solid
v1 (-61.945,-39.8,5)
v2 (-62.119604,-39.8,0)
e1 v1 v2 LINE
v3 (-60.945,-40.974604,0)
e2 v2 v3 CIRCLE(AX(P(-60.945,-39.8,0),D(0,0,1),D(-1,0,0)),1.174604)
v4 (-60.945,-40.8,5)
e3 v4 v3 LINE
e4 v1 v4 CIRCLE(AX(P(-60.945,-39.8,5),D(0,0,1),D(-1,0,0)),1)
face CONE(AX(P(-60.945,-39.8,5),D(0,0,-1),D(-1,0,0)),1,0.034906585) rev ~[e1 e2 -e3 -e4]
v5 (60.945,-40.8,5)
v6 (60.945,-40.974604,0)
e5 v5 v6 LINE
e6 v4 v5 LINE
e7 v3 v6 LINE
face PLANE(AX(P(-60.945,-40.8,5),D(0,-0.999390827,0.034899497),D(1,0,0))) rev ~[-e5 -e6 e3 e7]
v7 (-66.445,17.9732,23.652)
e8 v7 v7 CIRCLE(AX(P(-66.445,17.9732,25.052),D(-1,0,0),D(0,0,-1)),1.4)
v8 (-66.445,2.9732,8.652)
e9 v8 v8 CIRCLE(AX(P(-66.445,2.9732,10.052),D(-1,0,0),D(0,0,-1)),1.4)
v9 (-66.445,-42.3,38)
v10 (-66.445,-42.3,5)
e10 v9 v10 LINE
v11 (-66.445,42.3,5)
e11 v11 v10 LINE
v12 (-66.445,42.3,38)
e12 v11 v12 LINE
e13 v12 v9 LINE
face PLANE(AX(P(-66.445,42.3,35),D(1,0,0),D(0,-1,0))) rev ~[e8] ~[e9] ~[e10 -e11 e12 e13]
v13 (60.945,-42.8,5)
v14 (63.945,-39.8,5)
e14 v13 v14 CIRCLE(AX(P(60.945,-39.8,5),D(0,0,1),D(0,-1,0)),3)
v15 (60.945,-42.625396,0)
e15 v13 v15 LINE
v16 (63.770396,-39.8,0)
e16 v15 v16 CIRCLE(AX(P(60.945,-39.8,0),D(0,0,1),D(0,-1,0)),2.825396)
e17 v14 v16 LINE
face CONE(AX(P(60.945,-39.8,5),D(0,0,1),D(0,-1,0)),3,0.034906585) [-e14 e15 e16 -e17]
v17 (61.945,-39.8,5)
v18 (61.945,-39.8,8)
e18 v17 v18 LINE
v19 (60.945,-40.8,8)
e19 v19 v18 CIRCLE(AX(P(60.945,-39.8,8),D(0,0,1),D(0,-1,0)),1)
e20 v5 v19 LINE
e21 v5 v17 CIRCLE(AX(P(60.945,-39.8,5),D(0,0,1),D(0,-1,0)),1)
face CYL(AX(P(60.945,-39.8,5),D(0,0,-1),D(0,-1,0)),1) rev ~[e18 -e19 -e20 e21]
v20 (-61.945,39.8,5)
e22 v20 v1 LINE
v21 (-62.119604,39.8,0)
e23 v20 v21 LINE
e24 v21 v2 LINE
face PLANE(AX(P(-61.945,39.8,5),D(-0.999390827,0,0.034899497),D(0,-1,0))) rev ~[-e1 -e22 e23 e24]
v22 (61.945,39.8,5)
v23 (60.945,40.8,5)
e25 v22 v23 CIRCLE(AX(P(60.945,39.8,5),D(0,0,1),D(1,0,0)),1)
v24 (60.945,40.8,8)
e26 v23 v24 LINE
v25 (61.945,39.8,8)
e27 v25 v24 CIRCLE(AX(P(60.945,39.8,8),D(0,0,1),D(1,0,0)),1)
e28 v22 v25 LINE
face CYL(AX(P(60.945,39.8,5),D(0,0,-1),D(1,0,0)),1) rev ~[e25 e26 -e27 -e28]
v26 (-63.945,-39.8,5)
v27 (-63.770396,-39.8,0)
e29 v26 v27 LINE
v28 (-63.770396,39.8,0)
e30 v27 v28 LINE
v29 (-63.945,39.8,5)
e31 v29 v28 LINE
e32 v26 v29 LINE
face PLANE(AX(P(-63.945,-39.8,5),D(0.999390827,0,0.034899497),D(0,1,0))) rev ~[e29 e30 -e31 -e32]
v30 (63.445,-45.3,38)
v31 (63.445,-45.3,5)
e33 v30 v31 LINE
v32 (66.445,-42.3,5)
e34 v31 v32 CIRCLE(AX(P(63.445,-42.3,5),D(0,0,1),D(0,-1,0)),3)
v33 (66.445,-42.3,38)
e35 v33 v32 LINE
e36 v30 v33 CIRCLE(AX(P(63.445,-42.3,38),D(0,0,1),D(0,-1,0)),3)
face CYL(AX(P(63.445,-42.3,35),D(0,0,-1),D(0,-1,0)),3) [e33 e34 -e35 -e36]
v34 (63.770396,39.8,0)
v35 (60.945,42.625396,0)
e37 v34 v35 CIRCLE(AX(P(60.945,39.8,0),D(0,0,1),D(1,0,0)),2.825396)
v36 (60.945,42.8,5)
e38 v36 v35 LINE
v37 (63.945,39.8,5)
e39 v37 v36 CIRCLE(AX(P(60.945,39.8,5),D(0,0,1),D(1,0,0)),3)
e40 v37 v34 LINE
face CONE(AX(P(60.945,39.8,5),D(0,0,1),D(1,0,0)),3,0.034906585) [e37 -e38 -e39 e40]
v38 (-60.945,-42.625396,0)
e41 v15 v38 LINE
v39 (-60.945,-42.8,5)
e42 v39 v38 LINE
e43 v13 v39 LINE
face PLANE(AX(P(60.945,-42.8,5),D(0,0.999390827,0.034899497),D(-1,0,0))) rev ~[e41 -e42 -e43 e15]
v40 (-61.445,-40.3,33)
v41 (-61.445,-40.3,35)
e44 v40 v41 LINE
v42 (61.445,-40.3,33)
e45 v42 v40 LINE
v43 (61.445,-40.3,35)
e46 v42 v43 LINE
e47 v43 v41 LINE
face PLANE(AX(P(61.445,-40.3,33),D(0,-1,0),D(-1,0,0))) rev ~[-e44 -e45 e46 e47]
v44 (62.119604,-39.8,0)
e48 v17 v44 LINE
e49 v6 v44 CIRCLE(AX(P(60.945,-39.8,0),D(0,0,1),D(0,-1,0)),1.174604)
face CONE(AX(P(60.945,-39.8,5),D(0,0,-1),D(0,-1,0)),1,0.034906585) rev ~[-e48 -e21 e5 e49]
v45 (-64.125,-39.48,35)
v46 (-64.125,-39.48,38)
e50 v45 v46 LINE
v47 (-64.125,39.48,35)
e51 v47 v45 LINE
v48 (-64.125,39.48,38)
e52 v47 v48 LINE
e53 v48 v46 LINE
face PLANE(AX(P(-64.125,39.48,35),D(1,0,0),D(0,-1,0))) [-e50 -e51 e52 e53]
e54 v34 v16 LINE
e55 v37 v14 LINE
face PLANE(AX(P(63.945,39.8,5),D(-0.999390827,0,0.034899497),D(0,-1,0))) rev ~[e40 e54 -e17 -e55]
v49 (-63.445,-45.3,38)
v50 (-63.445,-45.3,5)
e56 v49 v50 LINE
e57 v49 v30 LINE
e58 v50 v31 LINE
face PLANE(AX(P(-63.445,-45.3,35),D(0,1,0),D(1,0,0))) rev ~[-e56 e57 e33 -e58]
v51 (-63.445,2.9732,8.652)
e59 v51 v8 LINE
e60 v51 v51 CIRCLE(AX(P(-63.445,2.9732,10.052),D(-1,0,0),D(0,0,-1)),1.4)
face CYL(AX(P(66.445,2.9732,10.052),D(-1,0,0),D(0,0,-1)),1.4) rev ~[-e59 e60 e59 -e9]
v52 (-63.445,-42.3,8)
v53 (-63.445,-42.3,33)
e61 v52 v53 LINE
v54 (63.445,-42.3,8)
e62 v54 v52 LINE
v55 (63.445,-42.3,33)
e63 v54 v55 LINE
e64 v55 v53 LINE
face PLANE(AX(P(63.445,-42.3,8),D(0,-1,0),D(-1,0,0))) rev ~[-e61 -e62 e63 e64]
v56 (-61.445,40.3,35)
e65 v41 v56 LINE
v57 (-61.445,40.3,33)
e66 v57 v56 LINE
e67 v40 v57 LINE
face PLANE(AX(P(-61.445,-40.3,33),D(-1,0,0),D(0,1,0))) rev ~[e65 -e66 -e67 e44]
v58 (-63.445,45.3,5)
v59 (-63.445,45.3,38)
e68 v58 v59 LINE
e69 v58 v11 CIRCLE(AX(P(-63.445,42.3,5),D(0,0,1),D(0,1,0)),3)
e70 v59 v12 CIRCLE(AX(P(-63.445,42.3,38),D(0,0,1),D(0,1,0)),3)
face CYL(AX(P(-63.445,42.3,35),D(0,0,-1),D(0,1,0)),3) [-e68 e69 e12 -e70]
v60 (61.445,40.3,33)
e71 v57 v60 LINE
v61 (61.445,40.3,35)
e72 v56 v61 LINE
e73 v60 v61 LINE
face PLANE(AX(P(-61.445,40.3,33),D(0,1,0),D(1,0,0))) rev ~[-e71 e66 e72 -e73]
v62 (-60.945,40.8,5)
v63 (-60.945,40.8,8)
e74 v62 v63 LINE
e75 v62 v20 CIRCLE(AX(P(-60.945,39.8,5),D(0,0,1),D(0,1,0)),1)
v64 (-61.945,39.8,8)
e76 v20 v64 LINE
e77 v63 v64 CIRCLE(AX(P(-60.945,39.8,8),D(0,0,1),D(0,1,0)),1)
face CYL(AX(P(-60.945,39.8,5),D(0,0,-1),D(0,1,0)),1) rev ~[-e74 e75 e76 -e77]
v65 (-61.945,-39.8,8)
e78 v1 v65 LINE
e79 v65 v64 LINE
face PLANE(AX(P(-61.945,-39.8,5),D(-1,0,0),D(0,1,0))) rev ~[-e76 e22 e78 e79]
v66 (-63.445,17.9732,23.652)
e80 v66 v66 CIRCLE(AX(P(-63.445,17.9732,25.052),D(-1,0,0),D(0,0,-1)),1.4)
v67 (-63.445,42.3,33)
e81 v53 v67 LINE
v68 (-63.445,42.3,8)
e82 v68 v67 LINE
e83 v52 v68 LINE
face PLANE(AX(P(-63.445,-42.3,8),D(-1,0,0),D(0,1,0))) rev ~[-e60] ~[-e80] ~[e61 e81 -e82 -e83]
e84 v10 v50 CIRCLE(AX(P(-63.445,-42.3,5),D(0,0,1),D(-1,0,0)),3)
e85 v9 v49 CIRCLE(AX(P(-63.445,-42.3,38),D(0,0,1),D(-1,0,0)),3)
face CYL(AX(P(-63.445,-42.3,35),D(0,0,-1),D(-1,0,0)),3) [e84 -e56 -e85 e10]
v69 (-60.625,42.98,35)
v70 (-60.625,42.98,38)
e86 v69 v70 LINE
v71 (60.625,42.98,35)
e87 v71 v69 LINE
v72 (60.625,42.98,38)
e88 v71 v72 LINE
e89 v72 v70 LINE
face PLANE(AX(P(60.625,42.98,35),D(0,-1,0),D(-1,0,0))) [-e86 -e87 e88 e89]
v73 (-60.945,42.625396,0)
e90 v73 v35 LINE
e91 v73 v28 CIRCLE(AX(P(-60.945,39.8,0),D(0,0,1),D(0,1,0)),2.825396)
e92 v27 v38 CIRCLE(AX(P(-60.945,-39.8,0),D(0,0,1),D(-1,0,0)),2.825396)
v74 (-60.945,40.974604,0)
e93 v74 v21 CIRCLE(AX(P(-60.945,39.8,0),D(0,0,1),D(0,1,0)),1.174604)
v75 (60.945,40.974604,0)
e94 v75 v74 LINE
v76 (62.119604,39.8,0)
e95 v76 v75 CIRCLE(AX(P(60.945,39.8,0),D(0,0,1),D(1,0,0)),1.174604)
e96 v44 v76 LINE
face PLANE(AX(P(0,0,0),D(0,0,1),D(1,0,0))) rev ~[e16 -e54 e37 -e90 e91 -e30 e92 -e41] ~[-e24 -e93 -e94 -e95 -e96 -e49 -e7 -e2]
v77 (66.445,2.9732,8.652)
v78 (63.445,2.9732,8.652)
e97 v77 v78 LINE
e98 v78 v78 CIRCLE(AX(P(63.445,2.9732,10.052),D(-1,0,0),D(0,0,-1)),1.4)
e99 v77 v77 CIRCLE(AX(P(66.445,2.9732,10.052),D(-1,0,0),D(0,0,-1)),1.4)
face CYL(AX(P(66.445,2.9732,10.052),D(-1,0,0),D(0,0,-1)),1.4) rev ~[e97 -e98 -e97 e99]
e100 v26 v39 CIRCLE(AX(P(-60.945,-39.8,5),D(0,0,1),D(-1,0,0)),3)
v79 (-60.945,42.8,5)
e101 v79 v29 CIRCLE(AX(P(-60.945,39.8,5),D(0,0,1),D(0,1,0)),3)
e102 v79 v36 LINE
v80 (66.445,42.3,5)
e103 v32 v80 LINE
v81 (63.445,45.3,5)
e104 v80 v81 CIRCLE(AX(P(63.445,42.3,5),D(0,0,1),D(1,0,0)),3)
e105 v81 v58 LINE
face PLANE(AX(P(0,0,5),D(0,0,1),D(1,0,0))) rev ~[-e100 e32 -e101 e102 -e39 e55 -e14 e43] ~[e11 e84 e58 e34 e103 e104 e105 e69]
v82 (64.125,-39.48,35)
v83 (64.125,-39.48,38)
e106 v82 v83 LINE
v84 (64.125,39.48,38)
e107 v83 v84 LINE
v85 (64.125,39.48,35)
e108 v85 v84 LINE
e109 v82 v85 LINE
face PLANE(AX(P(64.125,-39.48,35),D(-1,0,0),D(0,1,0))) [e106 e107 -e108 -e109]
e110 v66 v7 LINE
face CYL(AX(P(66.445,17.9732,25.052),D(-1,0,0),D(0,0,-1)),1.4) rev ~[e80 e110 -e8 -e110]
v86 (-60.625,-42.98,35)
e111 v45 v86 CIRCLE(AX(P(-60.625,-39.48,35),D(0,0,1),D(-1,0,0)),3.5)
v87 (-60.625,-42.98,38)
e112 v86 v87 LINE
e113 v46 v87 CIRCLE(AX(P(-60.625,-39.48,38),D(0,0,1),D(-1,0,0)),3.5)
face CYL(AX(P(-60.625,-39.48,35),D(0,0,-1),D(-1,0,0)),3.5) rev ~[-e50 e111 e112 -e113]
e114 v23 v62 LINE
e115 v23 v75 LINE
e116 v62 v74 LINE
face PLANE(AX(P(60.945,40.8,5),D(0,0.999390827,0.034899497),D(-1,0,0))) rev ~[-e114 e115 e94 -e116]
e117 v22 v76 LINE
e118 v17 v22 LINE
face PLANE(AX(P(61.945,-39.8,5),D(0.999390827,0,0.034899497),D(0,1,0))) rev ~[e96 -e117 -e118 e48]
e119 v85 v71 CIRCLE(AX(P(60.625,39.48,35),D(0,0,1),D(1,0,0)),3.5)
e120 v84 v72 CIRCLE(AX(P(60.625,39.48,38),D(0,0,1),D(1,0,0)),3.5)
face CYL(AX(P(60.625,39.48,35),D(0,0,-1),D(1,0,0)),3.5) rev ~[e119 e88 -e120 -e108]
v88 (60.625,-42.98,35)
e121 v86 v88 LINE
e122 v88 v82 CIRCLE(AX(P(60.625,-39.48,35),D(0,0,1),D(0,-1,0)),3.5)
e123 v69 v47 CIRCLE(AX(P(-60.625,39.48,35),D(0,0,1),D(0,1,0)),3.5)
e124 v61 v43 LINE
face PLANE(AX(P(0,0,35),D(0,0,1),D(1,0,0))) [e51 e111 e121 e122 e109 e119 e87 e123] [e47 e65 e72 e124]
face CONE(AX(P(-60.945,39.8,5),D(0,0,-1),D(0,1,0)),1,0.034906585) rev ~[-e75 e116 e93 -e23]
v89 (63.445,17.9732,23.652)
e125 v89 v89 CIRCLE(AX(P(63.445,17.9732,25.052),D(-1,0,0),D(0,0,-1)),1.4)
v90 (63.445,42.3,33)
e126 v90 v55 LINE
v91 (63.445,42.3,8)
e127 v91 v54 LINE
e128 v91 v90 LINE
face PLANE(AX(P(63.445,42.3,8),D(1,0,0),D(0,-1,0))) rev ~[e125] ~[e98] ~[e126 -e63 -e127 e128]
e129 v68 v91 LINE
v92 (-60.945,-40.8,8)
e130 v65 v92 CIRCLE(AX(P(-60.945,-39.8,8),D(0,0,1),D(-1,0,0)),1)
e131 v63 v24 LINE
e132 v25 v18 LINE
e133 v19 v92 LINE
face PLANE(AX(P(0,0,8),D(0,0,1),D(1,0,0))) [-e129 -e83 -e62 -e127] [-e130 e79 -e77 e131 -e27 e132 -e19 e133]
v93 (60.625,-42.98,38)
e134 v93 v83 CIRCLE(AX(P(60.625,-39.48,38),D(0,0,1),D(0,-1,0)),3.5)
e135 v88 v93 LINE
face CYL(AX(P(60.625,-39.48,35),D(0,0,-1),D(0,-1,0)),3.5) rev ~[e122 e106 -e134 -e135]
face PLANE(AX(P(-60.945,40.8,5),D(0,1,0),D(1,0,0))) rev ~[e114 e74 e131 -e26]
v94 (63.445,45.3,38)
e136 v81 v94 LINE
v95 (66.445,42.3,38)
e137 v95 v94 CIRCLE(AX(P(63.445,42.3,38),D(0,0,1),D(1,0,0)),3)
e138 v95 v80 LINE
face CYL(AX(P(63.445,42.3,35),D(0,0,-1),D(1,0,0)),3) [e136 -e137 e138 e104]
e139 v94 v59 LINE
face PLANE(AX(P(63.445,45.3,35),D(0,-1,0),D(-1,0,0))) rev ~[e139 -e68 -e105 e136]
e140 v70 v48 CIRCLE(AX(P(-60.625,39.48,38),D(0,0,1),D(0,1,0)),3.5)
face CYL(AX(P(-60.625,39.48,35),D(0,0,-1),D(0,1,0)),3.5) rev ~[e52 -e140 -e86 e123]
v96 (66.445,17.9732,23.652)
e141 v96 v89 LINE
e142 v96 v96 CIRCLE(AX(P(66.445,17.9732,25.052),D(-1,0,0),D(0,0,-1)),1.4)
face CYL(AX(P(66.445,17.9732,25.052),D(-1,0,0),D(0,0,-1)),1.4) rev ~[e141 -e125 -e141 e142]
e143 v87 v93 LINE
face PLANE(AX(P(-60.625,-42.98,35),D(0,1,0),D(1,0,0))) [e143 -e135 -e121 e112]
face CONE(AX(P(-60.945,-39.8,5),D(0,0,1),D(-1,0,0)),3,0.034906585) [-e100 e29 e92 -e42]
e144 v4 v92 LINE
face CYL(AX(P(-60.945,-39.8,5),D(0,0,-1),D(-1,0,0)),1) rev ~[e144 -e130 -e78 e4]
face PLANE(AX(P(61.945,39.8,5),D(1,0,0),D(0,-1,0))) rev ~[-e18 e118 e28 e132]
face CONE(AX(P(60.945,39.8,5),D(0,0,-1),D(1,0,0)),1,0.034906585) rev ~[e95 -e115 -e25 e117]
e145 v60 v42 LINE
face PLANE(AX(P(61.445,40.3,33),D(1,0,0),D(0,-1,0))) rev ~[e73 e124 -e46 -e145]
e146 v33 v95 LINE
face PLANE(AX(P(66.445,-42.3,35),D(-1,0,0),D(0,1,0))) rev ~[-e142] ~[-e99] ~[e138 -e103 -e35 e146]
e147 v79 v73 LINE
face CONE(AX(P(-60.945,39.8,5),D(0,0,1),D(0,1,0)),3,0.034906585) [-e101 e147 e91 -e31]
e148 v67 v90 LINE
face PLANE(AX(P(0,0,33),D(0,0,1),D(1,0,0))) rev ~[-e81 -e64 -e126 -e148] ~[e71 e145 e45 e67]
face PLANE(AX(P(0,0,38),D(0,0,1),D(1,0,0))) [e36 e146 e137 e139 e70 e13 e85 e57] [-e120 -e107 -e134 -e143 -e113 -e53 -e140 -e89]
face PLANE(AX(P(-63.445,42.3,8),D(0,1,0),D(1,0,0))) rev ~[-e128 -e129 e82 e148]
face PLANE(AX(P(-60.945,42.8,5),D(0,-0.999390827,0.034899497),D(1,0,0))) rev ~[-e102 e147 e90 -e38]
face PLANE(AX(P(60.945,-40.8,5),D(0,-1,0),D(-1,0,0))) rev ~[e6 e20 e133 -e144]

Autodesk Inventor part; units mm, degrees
ref_plane "YZ Plane" through (0, 0, 0) normal (1, 0, 0) x (0, 1, 0)
ref_plane "XZ Plane" through (0, 0, 0) normal (0, 1, 0) x (-1, 0, 0)
ref_plane "Arbeitsebene1" through (0, 0, 0) normal (0, 0, 1) x (1, 0, 0)
ref_plane "Arbeitsebene2" through (0, 0, 5) normal (0, 0, 1) x (1, 0, 0)
sketch "Skizze2" plane through (0, 0, 5) normal (0, 0, 1) x (1, 0, 0)
  arc A0 (-24.056, -76.2783) -> (-18.8, -75.35) centre (-21.51, -75.35) ccw projected
  arc A1 (63.445, -45.3) -> (66.445, -42.3) centre (63.445, -42.3) ccw projected
  line L0 (66.445, -42.3) -> (66.445, 42.3) projected
  arc A2 (66.445, 42.3) -> (63.445, 45.3) centre (63.445, 42.3) ccw projected
  line L1 (63.445, 45.3) -> (-63.445, 45.3) projected
  arc A3 (-63.445, 45.3) -> (-66.445, 42.3) centre (-63.445, 42.3) ccw projected
  line L2 (-66.445, 42.3) -> (-66.445, -42.3) projected
  arc A4 (-66.445, -42.3) -> (-63.445, -45.3) centre (-63.445, -42.3) ccw projected
  line L3 (-63.445, -45.3) -> (63.445, -45.3) projected
  arc A5 (63.945, 39.8) -> (60.945, 42.8) centre (60.945, 39.8) ccw projected
  line L4 (63.945, 39.8) -> (63.945, -39.8) projected
  arc A6 (60.945, -42.8) -> (63.945, -39.8) centre (60.945, -39.8) ccw projected
  line L5 (60.945, -42.8) -> (-60.945, -42.8) projected
  arc A7 (-63.945, -39.8) -> (-60.945, -42.8) centre (-60.945, -39.8) ccw projected
  line L6 (-63.945, -39.8) -> (-63.945, 39.8) projected
  arc A8 (-60.945, 42.8) -> (-63.945, 39.8) centre (-60.945, 39.8) ccw projected
  line L7 (-60.945, 42.8) -> (60.945, 42.8) projected
  line L8 (-61.945, 39.8) -> (-61.945, -39.8)
  arc A9 (-61.945, -39.8) -> (-60.945, -40.8) centre (-60.945, -39.8) ccw
  line L9 (-60.945, -40.8) -> (60.945, -40.8)
  arc A10 (60.945, -40.8) -> (61.945, -39.8) centre (60.945, -39.8) ccw
  line L10 (61.945, -39.8) -> (61.945, 39.8)
  arc A11 (61.945, 39.8) -> (60.945, 40.8) centre (60.945, 39.8) ccw
  line L11 (60.945, 40.8) -> (-60.945, 40.8)
  arc A12 (-60.945, 40.8) -> (-61.945, 39.8) centre (-60.945, 39.8) ccw
  point P0 (0, 0)
  dimension "d1" = 2
ref_plane "Arbeitsebene3" through (-63.945, -42.8, 0) normal (0, 0, 1) x (1, 0, 0)
extrude "Extrusion1" add sketch "Skizze2" against normal up to surface (5 mm away) draft -2 contours L4 A6 L5 A7 L6 A8 L7 A5
sketch "Skizze3" plane through (0, 0, 5) normal (0, 0, 1) x (1, 0, 0)
  arc A0 (63.445, -45.3) -> (66.445, -42.3) centre (63.445, -42.3) ccw projected
  line L0 (66.445, -42.3) -> (66.445, 42.3) projected
  arc A1 (66.445, 42.3) -> (63.445, 45.3) centre (63.445, 42.3) ccw projected
  line L1 (63.445, 45.3) -> (-63.445, 45.3) projected
  arc A2 (-63.445, 45.3) -> (-66.445, 42.3) centre (-63.445, 42.3) ccw projected
  line L2 (-66.445, 42.3) -> (-66.445, -42.3) projected
  arc A3 (-66.445, -42.3) -> (-63.445, -45.3) centre (-63.445, -42.3) ccw projected
  line L3 (-63.445, -45.3) -> (63.445, -45.3) projected
  arc A4 (63.945, 39.8) -> (60.945, 42.8) centre (60.945, 39.8) ccw projected
  line L4 (63.945, 39.8) -> (63.945, -39.8) projected
  arc A5 (60.945, -42.8) -> (63.945, -39.8) centre (60.945, -39.8) ccw projected
  line L5 (60.945, -42.8) -> (-60.945, -42.8) projected
  arc A6 (-63.945, -39.8) -> (-60.945, -42.8) centre (-60.945, -39.8) ccw projected
  line L6 (-63.945, -39.8) -> (-63.945, 39.8) projected
  arc A7 (-60.945, 42.8) -> (-63.945, 39.8) centre (-60.945, 39.8) ccw projected
  line L7 (-60.945, 42.8) -> (60.945, 42.8) projected
  line L8 (-61.945, -39.8) -> (-61.945, 39.8) projected
  arc A8 (-60.945, 40.8) -> (-61.945, 39.8) centre (-60.945, 39.8) ccw projected
  line L9 (-60.945, 40.8) -> (60.945, 40.8) projected
  arc A9 (61.945, 39.8) -> (60.945, 40.8) centre (60.945, 39.8) ccw projected
  line L10 (61.945, 39.8) -> (61.945, -39.8) projected
  arc A10 (60.945, -40.8) -> (61.945, -39.8) centre (60.945, -39.8) ccw projected
  line L11 (60.945, -40.8) -> (-60.945, -40.8) projected
  arc A11 (-61.945, -39.8) -> (-60.945, -40.8) centre (-60.945, -39.8) ccw projected
  line L12 (63.945, -39.8) -> (63.945, 39.8) projected
  arc A12 (63.945, 39.8) -> (60.945, 42.8) centre (60.945, 39.8) ccw projected
  line L13 (60.945, 42.8) -> (-60.945, 42.8) projected
  arc A13 (-60.945, 42.8) -> (-63.945, 39.8) centre (-60.945, 39.8) ccw projected
  line L14 (-63.945, 39.8) -> (-63.945, -39.8) projected
  arc A14 (-63.945, -39.8) -> (-60.945, -42.8) centre (-60.945, -39.8) ccw projected
  line L15 (-60.945, -42.8) -> (60.945, -42.8) projected
  arc A15 (60.945, -42.8) -> (63.945, -39.8) centre (60.945, -39.8) ccw projected
  point P0 (0, 0)
extrude "Extrusion2" add sketch "Skizze3" along normal blind 3 contours L3 A3 L2 A2 L1 A1 L0 A0 | L4 A5 L5 A6 L6 A7 L7 A4
sketch "Skizze4" plane through (0, 0, 8) normal (0, 0, 1) x (1, 0, 0)
  line L0 (66.445, -42.3) -> (66.445, 42.3) projected
  arc A0 (66.445, 42.3) -> (63.445, 45.3) centre (63.445, 42.3) ccw projected
  line L1 (63.445, 45.3) -> (-63.445, 45.3) projected
  arc A1 (-63.445, 45.3) -> (-66.445, 42.3) centre (-63.445, 42.3) ccw projected
  line L2 (-66.445, 42.3) -> (-66.445, -42.3) projected
  arc A2 (-66.445, -42.3) -> (-63.445, -45.3) centre (-63.445, -42.3) ccw projected
  line L3 (-63.445, -45.3) -> (63.445, -45.3) projected
  arc A3 (63.445, -45.3) -> (66.445, -42.3) centre (63.445, -42.3) ccw projected
  line L4 (60.945, -40.8) -> (-60.945, -40.8) projected
  arc A4 (-61.945, -39.8) -> (-60.945, -40.8) centre (-60.945, -39.8) ccw projected
  line L5 (-61.945, -39.8) -> (-61.945, 39.8) projected
  arc A5 (-60.945, 40.8) -> (-61.945, 39.8) centre (-60.945, 39.8) ccw projected
  line L6 (-60.945, 40.8) -> (60.945, 40.8) projected
  arc A6 (61.945, 39.8) -> (60.945, 40.8) centre (60.945, 39.8) ccw projected
  line L7 (61.945, 39.8) -> (61.945, -39.8) projected
  arc A7 (60.945, -40.8) -> (61.945, -39.8) centre (60.945, -39.8) ccw projected
  line L8 (-63.445, -42.3) -> (-63.445, 42.3)
  line L9 (-63.445, 42.3) -> (63.445, 42.3)
  line L10 (63.445, 42.3) -> (63.445, -42.3)
  line L11 (63.445, -42.3) -> (-63.445, -42.3)
  point P0 (0, 0)
  dimension "d6" = 3
extrude "Extrusion3" add sketch "Skizze4" along normal blind 25 contours A3 L3 A2 L2 A1 L1 A0 L0
sketch "Skizze5" plane through (0, 0, 33) normal (0, 0, 1) x (1, 0, 0)
  arc A0 (66.445, 42.3) -> (63.445, 45.3) centre (63.445, 42.3) ccw projected
  line L0 (63.445, 45.3) -> (-63.445, 45.3) projected
  arc A1 (-63.445, 45.3) -> (-66.445, 42.3) centre (-63.445, 42.3) ccw projected
  line L1 (-66.445, 42.3) -> (-66.445, -42.3) projected
  arc A2 (-66.445, -42.3) -> (-63.445, -45.3) centre (-63.445, -42.3) ccw projected
  line L2 (-63.445, -45.3) -> (63.445, -45.3) projected
  arc A3 (63.445, -45.3) -> (66.445, -42.3) centre (63.445, -42.3) ccw projected
  line L3 (66.445, -42.3) -> (66.445, 42.3) projected
  line L4 (-63.445, -42.3) -> (-63.445, 42.3) projected
  line L5 (-63.445, 42.3) -> (63.445, 42.3) projected
  line L6 (63.445, 42.3) -> (63.445, -42.3) projected
  line L7 (63.445, -42.3) -> (-63.445, -42.3) projected
  line L8 (-61.445, -40.3) -> (-61.445, 40.3)
  line L9 (-61.445, 40.3) -> (61.445, 40.3)
  line L10 (61.445, 40.3) -> (61.445, -40.3)
  line L11 (61.445, -40.3) -> (-61.445, -40.3)
  point P0 (0, 0)
  dimension "d9" = 2
extrude "Extrusion4" add sketch "Skizze5" along normal blind 2 contours L3 A3 L2 A2 L1 A1 L0 A0 | L4 L5 L6 L7
sketch "Skizze6" plane through (0, 0, 35) normal (0, 0, 1) x (1, 0, 0)
  line L0 (-60.625, -42.48) -> (60.625, -42.48) projected
  arc A0 (-63.625, -39.48) -> (-60.625, -42.48) centre (-60.625, -39.48) ccw projected
  line L1 (-63.625, 39.48) -> (-63.625, -39.48) projected
  arc A1 (-60.625, 42.48) -> (-63.625, 39.48) centre (-60.625, 39.48) ccw projected
  line L2 (60.625, 42.48) -> (-60.625, 42.48) projected
  arc A2 (63.625, 39.48) -> (60.625, 42.48) centre (60.625, 39.48) ccw projected
  line L3 (63.625, -39.48) -> (63.625, 39.48) projected
  arc A3 (60.625, -42.48) -> (63.625, -39.48) centre (60.625, -39.48) ccw projected
  line L4 (53.1911, 40.1013) -> (61.2463, 32.0461) projected
  arc A4 (53.1911, 40.1013) -> (51.0698, 40.98) centre (51.0698, 37.98) ccw projected
  line L5 (51.0698, 40.98) -> (-59.125, 40.98) projected
  arc A5 (-59.125, 40.98) -> (-62.125, 37.98) centre (-59.125, 37.98) ccw projected
  line L6 (-62.125, 37.98) -> (-62.125, -37.98) projected
  arc A6 (-62.125, -37.98) -> (-59.125, -40.98) centre (-59.125, -37.98) ccw projected
  line L7 (-59.125, -40.98) -> (51.0698, -40.98) projected
  arc A7 (51.0698, -40.98) -> (53.1911, -40.1013) centre (51.0698, -37.98) ccw projected
  line L8 (61.2463, -32.0461) -> (53.1911, -40.1013) projected
  arc A8 (61.2463, -32.0461) -> (62.125, -29.9248) centre (59.125, -29.9248) ccw projected
  line L9 (62.125, -29.9248) -> (62.125, 29.9248) projected
  arc A9 (62.125, 29.9248) -> (61.2463, 32.0461) centre (59.125, 29.9248) ccw projected
  arc A10 (-64.125, -39.48) -> (-60.625, -42.98) centre (-60.625, -39.48) ccw
  line L10 (-60.625, -42.98) -> (60.625, -42.98)
  arc A11 (60.625, -42.98) -> (64.125, -39.48) centre (60.625, -39.48) ccw
  line L11 (64.125, -39.48) -> (64.125, 39.48)
  arc A12 (64.125, 39.48) -> (60.625, 42.98) centre (60.625, 39.48) ccw
  line L12 (60.625, 42.98) -> (-60.625, 42.98)
  arc A13 (-60.625, 42.98) -> (-64.125, 39.48) centre (-60.625, 39.48) ccw
  line L13 (-64.125, 39.48) -> (-64.125, -39.48)
  line L14 (63.445, 45.3) -> (-63.445, 45.3) projected
  arc A14 (-63.445, 45.3) -> (-66.445, 42.3) centre (-63.445, 42.3) ccw projected
  line L15 (-66.445, 42.3) -> (-66.445, -42.3) projected
  arc A15 (-66.445, -42.3) -> (-63.445, -45.3) centre (-63.445, -42.3) ccw projected
  line L16 (-63.445, -45.3) -> (63.445, -45.3) projected
  arc A16 (63.445, -45.3) -> (66.445, -42.3) centre (63.445, -42.3) ccw projected
  line L17 (66.445, -42.3) -> (66.445, 42.3) projected
  arc A17 (66.445, 42.3) -> (63.445, 45.3) centre (63.445, 42.3) ccw projected
  line L18 (-61.445, -40.3) -> (-61.445, 40.3) projected
  line L19 (-61.445, 40.3) -> (61.445, 40.3) projected
  line L20 (61.445, 40.3) -> (61.445, -40.3) projected
  line L21 (61.445, -40.3) -> (-61.445, -40.3) projected
  point P0 (0, 0)
  dimension "d12" = 0.5
extrude "Extrusion5" add sketch "Skizze6" along normal blind 3 contours A17 L17 A16 L16 A15 L15 A14 L14
sketch "Skizze7" plane through (66.445, -42.3, 5) normal (1, 0, 0) x (0, 0, -1)
  circle A0 centre (-5.052, 45.2732) radius 1.49 projected
  circle A1 centre (-20.052, 60.2732) radius 1.4 projected
  point P0 (5, 42.3)
hole "Bohrung1" at (66.445, 2.9732, 10.052) at (66.445, 17.9732, 25.052) direction (-1, 0, 0) diameter 2.8 end through all
properties part number "NematostellaImager_spacer_v0"
